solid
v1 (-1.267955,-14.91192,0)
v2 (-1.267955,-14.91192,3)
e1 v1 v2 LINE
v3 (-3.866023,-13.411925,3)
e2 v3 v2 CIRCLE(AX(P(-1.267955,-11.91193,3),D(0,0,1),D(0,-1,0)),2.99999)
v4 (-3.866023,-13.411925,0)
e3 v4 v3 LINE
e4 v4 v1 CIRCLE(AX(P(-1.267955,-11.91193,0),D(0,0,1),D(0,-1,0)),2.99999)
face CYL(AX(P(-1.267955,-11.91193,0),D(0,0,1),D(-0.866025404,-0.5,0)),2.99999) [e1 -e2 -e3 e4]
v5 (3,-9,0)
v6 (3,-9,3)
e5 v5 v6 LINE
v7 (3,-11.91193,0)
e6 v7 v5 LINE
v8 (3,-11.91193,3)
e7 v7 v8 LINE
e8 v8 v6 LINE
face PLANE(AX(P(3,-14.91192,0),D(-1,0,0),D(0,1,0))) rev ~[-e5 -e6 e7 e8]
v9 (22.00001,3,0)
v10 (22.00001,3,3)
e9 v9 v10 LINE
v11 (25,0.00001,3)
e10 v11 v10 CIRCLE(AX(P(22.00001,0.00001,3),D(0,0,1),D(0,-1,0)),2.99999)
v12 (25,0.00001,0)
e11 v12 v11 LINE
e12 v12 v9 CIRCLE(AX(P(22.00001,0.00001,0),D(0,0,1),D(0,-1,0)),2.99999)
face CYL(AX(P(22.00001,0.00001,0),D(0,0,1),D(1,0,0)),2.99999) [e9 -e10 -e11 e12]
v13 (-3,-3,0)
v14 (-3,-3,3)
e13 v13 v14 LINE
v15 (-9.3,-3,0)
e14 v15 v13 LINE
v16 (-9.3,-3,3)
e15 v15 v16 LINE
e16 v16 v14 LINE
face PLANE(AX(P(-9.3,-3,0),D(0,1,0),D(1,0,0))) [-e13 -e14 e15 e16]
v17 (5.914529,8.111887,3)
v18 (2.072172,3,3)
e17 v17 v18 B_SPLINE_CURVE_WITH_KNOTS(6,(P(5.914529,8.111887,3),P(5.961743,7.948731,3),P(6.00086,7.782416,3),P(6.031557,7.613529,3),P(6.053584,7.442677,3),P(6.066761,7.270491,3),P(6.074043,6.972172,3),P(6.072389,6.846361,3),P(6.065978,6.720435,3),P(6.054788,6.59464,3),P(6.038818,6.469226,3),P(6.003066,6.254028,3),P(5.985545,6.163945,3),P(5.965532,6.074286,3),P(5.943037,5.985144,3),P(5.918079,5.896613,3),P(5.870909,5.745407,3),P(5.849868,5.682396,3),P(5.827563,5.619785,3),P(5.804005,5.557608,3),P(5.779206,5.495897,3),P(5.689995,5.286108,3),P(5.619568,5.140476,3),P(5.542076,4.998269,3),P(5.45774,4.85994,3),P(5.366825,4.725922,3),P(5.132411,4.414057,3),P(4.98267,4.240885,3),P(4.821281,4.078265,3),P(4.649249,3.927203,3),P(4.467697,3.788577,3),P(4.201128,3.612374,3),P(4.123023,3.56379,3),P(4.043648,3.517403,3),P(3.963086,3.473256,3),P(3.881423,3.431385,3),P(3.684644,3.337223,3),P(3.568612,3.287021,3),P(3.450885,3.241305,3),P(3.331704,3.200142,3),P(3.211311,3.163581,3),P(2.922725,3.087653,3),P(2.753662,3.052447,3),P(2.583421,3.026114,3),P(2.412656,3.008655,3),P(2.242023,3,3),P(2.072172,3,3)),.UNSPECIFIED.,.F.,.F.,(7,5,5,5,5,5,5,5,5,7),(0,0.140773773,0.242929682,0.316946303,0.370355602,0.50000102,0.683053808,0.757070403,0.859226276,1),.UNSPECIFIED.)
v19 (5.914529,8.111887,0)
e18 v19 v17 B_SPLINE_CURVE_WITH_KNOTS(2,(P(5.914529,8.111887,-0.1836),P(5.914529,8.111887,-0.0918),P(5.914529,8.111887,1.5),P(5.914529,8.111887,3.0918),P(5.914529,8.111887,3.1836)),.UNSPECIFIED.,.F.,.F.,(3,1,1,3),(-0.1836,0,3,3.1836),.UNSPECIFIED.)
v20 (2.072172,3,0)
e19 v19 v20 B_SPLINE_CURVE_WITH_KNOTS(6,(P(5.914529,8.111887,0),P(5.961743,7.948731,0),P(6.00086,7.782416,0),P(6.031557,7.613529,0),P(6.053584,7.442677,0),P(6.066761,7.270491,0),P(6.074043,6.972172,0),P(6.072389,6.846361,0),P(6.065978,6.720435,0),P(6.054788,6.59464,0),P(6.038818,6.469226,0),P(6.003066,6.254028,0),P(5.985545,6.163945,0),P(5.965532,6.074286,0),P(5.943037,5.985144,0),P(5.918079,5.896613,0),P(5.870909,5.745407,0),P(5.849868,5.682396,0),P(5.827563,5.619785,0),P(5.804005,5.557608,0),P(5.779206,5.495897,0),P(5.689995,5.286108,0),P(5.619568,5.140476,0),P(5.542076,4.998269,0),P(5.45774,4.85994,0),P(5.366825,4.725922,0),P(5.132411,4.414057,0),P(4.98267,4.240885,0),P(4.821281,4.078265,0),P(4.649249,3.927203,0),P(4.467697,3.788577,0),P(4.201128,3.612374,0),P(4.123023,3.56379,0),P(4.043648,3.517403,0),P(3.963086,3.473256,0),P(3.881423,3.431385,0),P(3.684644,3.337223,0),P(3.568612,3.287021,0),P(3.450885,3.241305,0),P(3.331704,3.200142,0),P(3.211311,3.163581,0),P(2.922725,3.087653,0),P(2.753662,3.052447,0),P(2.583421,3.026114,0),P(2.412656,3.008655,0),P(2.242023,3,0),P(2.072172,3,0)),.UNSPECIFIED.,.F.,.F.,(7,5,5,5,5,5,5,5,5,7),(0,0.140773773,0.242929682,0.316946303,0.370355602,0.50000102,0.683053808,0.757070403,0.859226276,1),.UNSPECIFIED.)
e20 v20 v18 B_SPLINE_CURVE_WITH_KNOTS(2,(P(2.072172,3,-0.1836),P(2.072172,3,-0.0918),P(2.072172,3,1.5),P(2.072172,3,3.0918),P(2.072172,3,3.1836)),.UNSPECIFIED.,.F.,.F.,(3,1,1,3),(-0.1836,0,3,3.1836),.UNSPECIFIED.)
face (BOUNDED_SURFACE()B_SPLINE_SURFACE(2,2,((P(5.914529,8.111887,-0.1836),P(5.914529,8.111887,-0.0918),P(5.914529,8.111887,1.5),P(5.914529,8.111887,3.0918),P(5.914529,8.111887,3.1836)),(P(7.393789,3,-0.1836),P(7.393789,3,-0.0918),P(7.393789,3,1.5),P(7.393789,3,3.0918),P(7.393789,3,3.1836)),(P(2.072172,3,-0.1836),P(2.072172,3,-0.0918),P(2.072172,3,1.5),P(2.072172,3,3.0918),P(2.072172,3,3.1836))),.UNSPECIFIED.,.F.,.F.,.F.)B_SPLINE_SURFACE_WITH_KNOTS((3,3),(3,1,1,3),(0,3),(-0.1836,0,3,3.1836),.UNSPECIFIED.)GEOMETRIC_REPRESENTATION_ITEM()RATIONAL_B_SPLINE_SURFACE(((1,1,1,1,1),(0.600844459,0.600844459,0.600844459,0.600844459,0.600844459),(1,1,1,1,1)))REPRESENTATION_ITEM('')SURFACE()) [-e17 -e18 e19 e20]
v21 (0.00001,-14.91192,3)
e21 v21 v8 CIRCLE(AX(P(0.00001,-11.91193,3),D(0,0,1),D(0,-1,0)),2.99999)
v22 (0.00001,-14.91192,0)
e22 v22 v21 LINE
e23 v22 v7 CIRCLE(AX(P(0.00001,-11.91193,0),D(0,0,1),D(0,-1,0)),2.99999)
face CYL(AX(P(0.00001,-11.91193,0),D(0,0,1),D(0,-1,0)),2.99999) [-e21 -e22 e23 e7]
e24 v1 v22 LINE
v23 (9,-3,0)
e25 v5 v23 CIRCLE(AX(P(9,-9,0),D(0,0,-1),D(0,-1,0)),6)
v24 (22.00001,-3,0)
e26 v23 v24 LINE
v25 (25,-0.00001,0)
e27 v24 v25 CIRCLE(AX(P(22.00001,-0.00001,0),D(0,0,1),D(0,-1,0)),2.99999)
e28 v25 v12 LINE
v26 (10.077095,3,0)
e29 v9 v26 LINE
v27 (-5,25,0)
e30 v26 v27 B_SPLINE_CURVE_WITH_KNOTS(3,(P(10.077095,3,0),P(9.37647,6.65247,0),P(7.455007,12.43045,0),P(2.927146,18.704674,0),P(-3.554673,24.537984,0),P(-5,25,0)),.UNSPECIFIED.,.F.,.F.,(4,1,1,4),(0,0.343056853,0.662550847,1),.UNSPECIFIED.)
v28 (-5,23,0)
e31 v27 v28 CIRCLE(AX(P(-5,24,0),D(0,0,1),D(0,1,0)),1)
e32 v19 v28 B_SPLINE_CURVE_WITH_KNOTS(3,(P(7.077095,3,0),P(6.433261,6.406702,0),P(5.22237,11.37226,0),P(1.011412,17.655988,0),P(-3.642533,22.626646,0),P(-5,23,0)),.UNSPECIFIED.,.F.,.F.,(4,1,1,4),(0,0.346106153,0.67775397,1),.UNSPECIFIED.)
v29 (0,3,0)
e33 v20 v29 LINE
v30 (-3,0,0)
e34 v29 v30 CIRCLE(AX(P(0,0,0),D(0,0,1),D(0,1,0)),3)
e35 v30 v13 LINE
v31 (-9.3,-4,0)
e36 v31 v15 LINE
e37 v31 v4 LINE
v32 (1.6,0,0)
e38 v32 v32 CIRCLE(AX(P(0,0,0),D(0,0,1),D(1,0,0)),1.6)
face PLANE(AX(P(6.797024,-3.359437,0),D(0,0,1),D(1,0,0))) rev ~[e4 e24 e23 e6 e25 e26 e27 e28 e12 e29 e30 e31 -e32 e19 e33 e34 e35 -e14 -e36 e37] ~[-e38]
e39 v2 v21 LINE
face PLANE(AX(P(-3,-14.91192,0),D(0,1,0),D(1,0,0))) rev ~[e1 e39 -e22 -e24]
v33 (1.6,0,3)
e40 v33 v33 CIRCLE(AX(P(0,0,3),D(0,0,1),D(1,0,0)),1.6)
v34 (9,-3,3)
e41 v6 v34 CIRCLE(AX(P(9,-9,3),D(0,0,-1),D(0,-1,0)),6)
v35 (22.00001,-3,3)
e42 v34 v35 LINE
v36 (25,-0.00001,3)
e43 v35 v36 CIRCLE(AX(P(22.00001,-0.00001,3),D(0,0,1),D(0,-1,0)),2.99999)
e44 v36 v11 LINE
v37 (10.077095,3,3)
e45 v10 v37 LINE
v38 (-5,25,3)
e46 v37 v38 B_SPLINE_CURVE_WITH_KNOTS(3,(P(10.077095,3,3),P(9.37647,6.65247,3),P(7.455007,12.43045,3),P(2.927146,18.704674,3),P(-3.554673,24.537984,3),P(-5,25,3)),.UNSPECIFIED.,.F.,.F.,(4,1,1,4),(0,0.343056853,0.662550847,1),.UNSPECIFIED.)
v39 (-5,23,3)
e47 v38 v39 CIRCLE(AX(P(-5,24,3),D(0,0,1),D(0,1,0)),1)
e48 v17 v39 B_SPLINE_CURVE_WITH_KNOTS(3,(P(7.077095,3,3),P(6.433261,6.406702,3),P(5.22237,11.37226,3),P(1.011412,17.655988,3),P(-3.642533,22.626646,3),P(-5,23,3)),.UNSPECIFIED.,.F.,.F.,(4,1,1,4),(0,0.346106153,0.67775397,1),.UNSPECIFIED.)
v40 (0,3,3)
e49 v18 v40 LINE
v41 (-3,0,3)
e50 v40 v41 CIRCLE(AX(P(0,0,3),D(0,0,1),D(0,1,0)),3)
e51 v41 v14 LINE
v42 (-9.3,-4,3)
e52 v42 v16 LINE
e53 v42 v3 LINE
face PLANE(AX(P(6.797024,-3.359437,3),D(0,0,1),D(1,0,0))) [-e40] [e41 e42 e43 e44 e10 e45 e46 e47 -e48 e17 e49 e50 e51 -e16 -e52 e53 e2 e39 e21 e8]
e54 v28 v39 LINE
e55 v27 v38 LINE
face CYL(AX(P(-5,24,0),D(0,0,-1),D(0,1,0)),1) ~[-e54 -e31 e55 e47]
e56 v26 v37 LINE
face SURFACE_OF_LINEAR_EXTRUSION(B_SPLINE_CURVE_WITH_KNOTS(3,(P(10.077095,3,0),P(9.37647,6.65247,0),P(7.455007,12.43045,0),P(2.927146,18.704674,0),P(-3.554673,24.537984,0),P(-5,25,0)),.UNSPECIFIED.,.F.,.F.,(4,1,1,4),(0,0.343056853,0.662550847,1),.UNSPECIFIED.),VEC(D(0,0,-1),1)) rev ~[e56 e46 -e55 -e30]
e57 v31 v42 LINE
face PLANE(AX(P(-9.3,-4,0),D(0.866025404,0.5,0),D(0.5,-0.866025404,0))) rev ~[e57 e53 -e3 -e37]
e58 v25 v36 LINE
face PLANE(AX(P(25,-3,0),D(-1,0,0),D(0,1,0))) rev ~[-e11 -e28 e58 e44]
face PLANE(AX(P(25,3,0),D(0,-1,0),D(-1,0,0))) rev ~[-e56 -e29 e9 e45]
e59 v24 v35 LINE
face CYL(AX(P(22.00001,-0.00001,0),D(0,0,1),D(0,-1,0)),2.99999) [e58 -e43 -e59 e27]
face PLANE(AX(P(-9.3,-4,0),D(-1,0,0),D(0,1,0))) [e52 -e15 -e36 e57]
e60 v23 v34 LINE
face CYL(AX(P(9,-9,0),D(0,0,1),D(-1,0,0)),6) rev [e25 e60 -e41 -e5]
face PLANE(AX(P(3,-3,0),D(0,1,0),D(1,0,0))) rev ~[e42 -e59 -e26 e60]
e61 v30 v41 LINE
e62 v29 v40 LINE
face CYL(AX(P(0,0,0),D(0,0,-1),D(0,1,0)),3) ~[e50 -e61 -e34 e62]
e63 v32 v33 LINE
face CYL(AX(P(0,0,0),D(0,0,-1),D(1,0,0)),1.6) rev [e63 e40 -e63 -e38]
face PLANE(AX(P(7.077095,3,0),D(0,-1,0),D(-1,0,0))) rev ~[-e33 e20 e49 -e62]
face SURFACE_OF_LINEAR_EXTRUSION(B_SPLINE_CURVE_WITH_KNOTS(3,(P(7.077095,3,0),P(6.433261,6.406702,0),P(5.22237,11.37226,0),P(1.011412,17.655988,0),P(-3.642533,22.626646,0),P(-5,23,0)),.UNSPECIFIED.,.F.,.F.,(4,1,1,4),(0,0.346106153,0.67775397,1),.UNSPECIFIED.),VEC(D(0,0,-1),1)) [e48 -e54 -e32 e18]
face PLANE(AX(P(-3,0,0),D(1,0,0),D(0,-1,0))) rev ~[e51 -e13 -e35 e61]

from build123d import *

# Parameters (mm, degrees)
F0_R     = 1.6
F0_W     = 6.3
F0_H     = 1
F1_DEPTH = 3
F2_R     = 2.99999
F3_R     = 6
F4_R     = 4


# Not quite as in the source:
# - a fillet or chamfer is up to 0.001 mm smaller than in the source, because OpenCascade refuses the exact size
# - a feature names something its author has since deleted; it is built from what else it names


with BuildPart() as f1:
    # F0 (on Top) → F1 (new body)
    with BuildSketch(Plane.XY):
        with BuildLine():
            ThreePointArc((0, 3), (-2.1213203436, 2.1213203436), (-3, 0))
            Line((-3, 0), (-3, -3))
            Line((-3, -3), (-3, -4))
            Line((-3, -4), (-9.3, -4))
            Line((-9.3, -4), (-3, -14.9119200877))
            Line((-3, -14.9119200877), (3, -14.9119200877))
            Line((3, -14.9119200877), (3, -3))
            Line((3, -3), (25, -3))
            Line((25, -3), (25, 3))
            Line((25, 3), (10.0770951748, 3))
            Line((10.0770951748, 3), (7.0770951748, 3))
            Line((7.0770951748, 3), (0, 3))
        make_face()
        Circle(F0_R, mode=Mode.SUBTRACT)
        with Locations((-6.15, -3.5)):
            Rectangle(F0_W, F0_H)
        with BuildLine():
            add(Edge.make_bspline(
                [(7.0770951748, 3), (6.4332614255, 6.4067024909), (5.2223697544, 11.3722601643), (1.0114116485, 17.6559878049), (-3.6425327417, 22.6266458631), (-5, 23)],
                knots=[0, 0, 0, 0, 0.3461061531, 0.6777539699, 1, 1, 1, 1], degree=3))
            Line((7.0770951748, 3), (10.0770951748, 3))
            add(Edge.make_bspline(
                [(10.0770951748, 3), (9.3764700877, 6.6524697116), (7.4550072041, 12.4304500602), (2.9271463912, 18.7046739484), (-3.554672909, 24.5379839434), (-5, 25)],
                knots=[0, 0, 0, 0, 0.3430568532, 0.6625508471, 1, 1, 1, 1], degree=3))
            ThreePointArc((-5, 25), (-6, 24), (-5, 23))
        make_face()
    extrude(amount=F1_DEPTH)

    # F2 (radius 3 in the source; OpenCascade refuses exactly that, so slightly less here)
    f2_edges = [f1.edges().sort_by_distance(p)[0] for p in [
        (-3, -14.91192, 1.5),
        (3, -14.91192, 1.5),
        (25, -3, 1.5),
        (25, 3, 1.5),
    ]]
    fillet(f2_edges, radius=F2_R)

    # F3
    f3_edges = [f1.edges().sort_by_distance(p)[0] for p in [
        (3, -3, 1.5),
    ]]
    fillet(f3_edges, radius=F3_R)

    # F4
    f4_edges = [f1.edges().sort_by_distance(p)[0] for p in [
        (7.077095, 3, 1.5),
    ]]
    fillet(f4_edges, radius=F4_R)


solid = f1.part
